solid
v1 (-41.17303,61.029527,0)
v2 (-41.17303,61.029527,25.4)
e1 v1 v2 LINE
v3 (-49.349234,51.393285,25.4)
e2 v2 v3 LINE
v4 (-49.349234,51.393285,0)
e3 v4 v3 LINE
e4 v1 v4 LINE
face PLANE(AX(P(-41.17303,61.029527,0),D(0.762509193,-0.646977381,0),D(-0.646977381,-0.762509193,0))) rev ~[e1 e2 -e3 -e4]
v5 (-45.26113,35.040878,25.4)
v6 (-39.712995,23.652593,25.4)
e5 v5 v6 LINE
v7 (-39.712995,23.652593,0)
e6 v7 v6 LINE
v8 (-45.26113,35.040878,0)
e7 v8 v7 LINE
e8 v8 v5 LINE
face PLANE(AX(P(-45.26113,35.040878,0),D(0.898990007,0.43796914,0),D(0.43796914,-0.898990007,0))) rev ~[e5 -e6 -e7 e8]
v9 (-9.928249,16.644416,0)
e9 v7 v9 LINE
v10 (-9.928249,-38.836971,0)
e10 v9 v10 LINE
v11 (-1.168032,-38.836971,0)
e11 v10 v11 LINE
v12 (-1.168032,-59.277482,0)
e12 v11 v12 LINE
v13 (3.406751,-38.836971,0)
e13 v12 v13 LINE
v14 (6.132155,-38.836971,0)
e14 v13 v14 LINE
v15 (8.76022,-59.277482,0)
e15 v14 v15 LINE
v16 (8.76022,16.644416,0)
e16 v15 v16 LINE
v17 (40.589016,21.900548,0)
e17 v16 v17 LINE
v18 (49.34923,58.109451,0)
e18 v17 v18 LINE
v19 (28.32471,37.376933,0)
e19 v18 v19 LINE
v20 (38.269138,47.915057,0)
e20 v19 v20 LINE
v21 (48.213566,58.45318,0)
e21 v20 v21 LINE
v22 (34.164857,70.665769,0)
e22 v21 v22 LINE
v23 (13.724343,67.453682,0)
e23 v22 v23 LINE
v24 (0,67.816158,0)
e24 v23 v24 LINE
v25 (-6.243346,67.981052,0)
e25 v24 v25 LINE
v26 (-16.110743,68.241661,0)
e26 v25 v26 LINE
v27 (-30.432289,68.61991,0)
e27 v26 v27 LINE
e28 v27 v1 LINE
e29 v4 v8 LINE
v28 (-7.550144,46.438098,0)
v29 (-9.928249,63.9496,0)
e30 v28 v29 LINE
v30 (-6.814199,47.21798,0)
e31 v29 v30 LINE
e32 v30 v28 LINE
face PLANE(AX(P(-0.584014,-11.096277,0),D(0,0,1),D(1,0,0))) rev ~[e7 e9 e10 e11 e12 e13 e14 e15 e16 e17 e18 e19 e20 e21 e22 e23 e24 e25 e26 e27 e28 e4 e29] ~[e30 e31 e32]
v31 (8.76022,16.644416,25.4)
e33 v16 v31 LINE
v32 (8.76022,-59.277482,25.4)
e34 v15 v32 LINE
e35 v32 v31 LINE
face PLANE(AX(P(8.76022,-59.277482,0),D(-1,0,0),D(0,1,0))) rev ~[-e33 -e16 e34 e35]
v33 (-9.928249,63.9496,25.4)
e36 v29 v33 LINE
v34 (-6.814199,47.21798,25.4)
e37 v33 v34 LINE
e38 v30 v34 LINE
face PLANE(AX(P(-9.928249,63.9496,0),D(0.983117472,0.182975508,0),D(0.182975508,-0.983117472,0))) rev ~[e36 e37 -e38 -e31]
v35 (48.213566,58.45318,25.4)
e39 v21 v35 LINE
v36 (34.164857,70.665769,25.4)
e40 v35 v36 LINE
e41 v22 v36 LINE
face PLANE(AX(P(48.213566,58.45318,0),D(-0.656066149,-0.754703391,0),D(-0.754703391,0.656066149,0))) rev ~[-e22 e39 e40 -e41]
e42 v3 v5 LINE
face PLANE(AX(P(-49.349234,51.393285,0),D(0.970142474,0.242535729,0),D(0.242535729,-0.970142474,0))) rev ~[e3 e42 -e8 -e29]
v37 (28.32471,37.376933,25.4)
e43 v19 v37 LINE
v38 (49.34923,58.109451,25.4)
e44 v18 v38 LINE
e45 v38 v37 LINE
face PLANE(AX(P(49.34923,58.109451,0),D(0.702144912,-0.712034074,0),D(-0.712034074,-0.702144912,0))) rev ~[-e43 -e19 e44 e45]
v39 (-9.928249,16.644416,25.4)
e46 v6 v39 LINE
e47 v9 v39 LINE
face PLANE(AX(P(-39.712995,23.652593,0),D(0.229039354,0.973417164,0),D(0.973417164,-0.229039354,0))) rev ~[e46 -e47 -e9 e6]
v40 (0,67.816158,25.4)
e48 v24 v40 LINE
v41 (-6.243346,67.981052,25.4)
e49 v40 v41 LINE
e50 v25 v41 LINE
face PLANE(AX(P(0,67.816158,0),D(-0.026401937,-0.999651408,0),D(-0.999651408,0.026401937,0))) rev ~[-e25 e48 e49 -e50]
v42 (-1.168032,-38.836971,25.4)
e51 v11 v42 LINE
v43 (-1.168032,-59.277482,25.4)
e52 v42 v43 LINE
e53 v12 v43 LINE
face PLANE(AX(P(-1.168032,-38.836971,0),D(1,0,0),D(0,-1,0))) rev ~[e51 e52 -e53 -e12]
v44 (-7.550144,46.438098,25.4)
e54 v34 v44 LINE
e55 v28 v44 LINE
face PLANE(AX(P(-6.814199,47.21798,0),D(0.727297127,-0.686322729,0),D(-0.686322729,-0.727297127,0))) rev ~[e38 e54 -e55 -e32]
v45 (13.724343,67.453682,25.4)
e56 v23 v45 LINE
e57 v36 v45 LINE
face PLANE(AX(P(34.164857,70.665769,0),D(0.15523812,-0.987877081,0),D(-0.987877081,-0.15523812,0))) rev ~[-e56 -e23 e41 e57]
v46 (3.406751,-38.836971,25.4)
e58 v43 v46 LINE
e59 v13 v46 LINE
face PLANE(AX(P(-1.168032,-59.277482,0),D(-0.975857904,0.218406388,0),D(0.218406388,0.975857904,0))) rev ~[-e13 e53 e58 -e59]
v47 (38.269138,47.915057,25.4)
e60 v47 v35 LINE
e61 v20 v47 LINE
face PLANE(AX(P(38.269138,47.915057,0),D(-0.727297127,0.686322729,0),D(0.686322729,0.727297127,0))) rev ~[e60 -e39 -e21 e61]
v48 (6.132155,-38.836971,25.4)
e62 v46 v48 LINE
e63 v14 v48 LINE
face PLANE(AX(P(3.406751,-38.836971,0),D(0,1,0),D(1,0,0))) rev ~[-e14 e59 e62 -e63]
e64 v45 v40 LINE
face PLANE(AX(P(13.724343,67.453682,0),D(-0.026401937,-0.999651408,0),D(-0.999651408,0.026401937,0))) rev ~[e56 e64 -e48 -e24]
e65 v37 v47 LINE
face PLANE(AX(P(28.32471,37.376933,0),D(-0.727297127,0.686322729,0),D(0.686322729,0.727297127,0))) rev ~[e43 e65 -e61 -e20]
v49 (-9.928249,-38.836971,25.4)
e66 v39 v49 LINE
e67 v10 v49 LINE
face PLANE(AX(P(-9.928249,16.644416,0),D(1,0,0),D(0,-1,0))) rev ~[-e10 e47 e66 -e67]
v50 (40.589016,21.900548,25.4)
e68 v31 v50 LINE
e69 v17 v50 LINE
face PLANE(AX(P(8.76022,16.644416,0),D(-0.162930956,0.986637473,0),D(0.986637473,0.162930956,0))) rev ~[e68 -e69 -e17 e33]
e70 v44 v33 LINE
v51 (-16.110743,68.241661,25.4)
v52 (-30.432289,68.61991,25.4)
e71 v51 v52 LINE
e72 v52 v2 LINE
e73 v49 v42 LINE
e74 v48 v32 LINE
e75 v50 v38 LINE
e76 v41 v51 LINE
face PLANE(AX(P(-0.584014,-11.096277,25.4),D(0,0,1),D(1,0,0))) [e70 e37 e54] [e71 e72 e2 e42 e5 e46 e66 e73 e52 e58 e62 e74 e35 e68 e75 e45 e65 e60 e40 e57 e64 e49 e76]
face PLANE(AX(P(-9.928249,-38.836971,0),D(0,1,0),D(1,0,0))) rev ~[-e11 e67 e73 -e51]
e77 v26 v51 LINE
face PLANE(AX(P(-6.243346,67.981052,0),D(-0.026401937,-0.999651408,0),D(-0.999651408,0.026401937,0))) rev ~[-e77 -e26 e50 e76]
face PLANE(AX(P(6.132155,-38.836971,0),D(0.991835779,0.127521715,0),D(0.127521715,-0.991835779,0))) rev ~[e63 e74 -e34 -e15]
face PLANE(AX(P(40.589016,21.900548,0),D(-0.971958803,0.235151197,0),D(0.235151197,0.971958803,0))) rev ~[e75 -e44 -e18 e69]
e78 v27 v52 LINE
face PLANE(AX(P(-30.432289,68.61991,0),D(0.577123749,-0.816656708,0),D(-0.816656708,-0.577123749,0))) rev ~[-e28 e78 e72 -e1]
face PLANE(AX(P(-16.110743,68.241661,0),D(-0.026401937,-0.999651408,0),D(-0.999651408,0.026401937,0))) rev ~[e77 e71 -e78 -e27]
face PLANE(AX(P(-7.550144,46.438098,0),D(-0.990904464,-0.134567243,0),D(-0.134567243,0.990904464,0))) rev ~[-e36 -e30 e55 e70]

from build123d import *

# Parameters (mm, degrees)
F1_DEPTH = 25.4


with BuildPart() as f1:
    # F0 (on Top) → F1 (new body)
    with BuildSketch(Plane.XY):
        Polygon((-9.9282488227, 16.6444163769), (-9.9282488227, -38.8369709253), (-6.8141991987, -38.8369709253), (-4.3801111169, -38.8369709253), (-1.1680317111, -38.8369709253), (3.4067514008, -38.8369709253), (6.1321551912, -38.8369709253), (8.7602203712, -38.8369709253), (8.7602203712, 16.6444163769), (0, 16.6444163769), (-3.5040895455, 16.6444163769), (-6.8141991987, 16.6444163769), align=None)
        Polygon((-20.4405128956, 23.6525926739), (-9.9282488227, 16.6444163769), (-6.8141991987, 16.6444163769), (-12.2392783805, 23.6525926739), (-12.264306657, 23.6525926739), align=None)
        Polygon((-39.7129952908, 23.6525926739), (-9.9282488227, 16.6444163769), (-20.4405128956, 23.6525926739), align=None)
        Polygon((-12.2392783805, 23.6525926739), (-6.8141991987, 16.6444163769), (-3.5040895455, 16.6444163769), (-6.6358093424, 39.7052673339), (0, 27.0106745884), (0, 40.0465349111), (0, 51.3932853937), (-6.2433463768, 67.9810519437), (-16.1107429013, 68.2416611761), (-23.2746789764, 63.9495998621), (-15.1843791828, 53.4984625885), (-21.9592093912, 36.2089052796), (-18.098320559, 31.2213670903), align=None)
        Polygon((-6.8141991987, 47.2179802464), (-7.5501442092, 46.4380983203), (-9.9282488227, 63.9495998621), align=None, mode=Mode.SUBTRACT)
        Polygon((-30.4814127266, 30.3465261318), (-20.4405128956, 23.6525926739), (-12.264306657, 23.6525926739), (-12.2392783805, 23.6525926739), (-18.098320559, 31.2213670903), (-30.4814127266, 32.9626211831), align=None)
        Polygon((-39.7129952908, 23.6525926739), (-20.4405128956, 23.6525926739), (-30.4814127266, 30.3465261318), (-30.4814127266, 32.9626211831), (-45.2611297369, 35.0408777595), align=None)
        Polygon((3.4067514008, -38.8369709253), (-1.1680317111, -38.8369709253), (-1.1680317111, -59.2774823308), align=None)
        Polygon((-6.6358093424, 39.7052673339), (-3.5040895455, 16.6444163769), (0, 16.6444163769), (0, 21.9005476683), (0, 27.0106745884), align=None)
        Polygon((-49.3492335081, 51.3932853937), (-45.2611297369, 35.0408777595), (-30.4814127266, 32.9626211831), (-18.098320559, 31.2213670903), (-21.9592093912, 36.2089052796), (-30.4814127266, 47.2179802464), align=None)
        Polygon((0, 21.9005476683), (0, 16.6444163769), (8.7602203712, 16.6444163769), (15.9789933035, 43.8407290326), (18.5424652882, 53.4984625885), (21.3165320456, 63.9495998621), (34.1648571193, 70.665769279), (13.7243429199, 67.4536824226), (0, 56.9414235651), (0, 51.3932853937), (0, 40.0465349111), (0, 27.0106745884), align=None)
        Polygon((-41.173029691, 61.0295273364), (-49.3492335081, 51.3932853937), (-30.4814127266, 47.2179802464), (-33.7135461765, 51.3932853937), align=None)
        Polygon((8.7602203712, -38.8369709253), (6.1321551912, -38.8369709253), (8.7602203712, -59.2774823308), align=None)
        Polygon((15.9789933035, 43.8407290326), (8.7602203712, 16.6444163769), (18.5424652882, 27.0106745884), (28.3247102052, 37.3769327998), (38.2691381014, 47.9150565343), (48.2135659976, 58.4531802689), (34.1648571193, 70.665769279), (21.3165320456, 63.9495998621), (18.5424652882, 53.4984625885), align=None)
        Polygon((18.5424652882, 27.0106745884), (8.7602203712, 16.6444163769), (40.5890159309, 21.9005476683), (49.3492297828, 58.1094510853), (28.3247102052, 37.3769327998), align=None)
        Polygon((-30.4814127266, 47.2179802464), (-21.9592093912, 36.2089052796), (-15.1843791828, 53.4984625885), (-23.2746789764, 63.9495998621), (-16.1107429013, 68.2416611761), (-30.4322889094, 68.6199095927), (-33.7135461765, 51.3932853937), align=None)
        Polygon((-30.4322889094, 68.6199095927), (-41.173029691, 61.0295273364), (-33.7135461765, 51.3932853937), align=None)
        Polygon((-6.2433463768, 67.9810519437), (0, 51.3932853937), (0, 56.9414235651), (0, 67.8161580224), align=None)
        Polygon((0, 67.8161580224), (0, 56.9414235651), (13.7243429199, 67.4536824226), align=None)
    extrude(amount=F1_DEPTH)


solid = f1.part
